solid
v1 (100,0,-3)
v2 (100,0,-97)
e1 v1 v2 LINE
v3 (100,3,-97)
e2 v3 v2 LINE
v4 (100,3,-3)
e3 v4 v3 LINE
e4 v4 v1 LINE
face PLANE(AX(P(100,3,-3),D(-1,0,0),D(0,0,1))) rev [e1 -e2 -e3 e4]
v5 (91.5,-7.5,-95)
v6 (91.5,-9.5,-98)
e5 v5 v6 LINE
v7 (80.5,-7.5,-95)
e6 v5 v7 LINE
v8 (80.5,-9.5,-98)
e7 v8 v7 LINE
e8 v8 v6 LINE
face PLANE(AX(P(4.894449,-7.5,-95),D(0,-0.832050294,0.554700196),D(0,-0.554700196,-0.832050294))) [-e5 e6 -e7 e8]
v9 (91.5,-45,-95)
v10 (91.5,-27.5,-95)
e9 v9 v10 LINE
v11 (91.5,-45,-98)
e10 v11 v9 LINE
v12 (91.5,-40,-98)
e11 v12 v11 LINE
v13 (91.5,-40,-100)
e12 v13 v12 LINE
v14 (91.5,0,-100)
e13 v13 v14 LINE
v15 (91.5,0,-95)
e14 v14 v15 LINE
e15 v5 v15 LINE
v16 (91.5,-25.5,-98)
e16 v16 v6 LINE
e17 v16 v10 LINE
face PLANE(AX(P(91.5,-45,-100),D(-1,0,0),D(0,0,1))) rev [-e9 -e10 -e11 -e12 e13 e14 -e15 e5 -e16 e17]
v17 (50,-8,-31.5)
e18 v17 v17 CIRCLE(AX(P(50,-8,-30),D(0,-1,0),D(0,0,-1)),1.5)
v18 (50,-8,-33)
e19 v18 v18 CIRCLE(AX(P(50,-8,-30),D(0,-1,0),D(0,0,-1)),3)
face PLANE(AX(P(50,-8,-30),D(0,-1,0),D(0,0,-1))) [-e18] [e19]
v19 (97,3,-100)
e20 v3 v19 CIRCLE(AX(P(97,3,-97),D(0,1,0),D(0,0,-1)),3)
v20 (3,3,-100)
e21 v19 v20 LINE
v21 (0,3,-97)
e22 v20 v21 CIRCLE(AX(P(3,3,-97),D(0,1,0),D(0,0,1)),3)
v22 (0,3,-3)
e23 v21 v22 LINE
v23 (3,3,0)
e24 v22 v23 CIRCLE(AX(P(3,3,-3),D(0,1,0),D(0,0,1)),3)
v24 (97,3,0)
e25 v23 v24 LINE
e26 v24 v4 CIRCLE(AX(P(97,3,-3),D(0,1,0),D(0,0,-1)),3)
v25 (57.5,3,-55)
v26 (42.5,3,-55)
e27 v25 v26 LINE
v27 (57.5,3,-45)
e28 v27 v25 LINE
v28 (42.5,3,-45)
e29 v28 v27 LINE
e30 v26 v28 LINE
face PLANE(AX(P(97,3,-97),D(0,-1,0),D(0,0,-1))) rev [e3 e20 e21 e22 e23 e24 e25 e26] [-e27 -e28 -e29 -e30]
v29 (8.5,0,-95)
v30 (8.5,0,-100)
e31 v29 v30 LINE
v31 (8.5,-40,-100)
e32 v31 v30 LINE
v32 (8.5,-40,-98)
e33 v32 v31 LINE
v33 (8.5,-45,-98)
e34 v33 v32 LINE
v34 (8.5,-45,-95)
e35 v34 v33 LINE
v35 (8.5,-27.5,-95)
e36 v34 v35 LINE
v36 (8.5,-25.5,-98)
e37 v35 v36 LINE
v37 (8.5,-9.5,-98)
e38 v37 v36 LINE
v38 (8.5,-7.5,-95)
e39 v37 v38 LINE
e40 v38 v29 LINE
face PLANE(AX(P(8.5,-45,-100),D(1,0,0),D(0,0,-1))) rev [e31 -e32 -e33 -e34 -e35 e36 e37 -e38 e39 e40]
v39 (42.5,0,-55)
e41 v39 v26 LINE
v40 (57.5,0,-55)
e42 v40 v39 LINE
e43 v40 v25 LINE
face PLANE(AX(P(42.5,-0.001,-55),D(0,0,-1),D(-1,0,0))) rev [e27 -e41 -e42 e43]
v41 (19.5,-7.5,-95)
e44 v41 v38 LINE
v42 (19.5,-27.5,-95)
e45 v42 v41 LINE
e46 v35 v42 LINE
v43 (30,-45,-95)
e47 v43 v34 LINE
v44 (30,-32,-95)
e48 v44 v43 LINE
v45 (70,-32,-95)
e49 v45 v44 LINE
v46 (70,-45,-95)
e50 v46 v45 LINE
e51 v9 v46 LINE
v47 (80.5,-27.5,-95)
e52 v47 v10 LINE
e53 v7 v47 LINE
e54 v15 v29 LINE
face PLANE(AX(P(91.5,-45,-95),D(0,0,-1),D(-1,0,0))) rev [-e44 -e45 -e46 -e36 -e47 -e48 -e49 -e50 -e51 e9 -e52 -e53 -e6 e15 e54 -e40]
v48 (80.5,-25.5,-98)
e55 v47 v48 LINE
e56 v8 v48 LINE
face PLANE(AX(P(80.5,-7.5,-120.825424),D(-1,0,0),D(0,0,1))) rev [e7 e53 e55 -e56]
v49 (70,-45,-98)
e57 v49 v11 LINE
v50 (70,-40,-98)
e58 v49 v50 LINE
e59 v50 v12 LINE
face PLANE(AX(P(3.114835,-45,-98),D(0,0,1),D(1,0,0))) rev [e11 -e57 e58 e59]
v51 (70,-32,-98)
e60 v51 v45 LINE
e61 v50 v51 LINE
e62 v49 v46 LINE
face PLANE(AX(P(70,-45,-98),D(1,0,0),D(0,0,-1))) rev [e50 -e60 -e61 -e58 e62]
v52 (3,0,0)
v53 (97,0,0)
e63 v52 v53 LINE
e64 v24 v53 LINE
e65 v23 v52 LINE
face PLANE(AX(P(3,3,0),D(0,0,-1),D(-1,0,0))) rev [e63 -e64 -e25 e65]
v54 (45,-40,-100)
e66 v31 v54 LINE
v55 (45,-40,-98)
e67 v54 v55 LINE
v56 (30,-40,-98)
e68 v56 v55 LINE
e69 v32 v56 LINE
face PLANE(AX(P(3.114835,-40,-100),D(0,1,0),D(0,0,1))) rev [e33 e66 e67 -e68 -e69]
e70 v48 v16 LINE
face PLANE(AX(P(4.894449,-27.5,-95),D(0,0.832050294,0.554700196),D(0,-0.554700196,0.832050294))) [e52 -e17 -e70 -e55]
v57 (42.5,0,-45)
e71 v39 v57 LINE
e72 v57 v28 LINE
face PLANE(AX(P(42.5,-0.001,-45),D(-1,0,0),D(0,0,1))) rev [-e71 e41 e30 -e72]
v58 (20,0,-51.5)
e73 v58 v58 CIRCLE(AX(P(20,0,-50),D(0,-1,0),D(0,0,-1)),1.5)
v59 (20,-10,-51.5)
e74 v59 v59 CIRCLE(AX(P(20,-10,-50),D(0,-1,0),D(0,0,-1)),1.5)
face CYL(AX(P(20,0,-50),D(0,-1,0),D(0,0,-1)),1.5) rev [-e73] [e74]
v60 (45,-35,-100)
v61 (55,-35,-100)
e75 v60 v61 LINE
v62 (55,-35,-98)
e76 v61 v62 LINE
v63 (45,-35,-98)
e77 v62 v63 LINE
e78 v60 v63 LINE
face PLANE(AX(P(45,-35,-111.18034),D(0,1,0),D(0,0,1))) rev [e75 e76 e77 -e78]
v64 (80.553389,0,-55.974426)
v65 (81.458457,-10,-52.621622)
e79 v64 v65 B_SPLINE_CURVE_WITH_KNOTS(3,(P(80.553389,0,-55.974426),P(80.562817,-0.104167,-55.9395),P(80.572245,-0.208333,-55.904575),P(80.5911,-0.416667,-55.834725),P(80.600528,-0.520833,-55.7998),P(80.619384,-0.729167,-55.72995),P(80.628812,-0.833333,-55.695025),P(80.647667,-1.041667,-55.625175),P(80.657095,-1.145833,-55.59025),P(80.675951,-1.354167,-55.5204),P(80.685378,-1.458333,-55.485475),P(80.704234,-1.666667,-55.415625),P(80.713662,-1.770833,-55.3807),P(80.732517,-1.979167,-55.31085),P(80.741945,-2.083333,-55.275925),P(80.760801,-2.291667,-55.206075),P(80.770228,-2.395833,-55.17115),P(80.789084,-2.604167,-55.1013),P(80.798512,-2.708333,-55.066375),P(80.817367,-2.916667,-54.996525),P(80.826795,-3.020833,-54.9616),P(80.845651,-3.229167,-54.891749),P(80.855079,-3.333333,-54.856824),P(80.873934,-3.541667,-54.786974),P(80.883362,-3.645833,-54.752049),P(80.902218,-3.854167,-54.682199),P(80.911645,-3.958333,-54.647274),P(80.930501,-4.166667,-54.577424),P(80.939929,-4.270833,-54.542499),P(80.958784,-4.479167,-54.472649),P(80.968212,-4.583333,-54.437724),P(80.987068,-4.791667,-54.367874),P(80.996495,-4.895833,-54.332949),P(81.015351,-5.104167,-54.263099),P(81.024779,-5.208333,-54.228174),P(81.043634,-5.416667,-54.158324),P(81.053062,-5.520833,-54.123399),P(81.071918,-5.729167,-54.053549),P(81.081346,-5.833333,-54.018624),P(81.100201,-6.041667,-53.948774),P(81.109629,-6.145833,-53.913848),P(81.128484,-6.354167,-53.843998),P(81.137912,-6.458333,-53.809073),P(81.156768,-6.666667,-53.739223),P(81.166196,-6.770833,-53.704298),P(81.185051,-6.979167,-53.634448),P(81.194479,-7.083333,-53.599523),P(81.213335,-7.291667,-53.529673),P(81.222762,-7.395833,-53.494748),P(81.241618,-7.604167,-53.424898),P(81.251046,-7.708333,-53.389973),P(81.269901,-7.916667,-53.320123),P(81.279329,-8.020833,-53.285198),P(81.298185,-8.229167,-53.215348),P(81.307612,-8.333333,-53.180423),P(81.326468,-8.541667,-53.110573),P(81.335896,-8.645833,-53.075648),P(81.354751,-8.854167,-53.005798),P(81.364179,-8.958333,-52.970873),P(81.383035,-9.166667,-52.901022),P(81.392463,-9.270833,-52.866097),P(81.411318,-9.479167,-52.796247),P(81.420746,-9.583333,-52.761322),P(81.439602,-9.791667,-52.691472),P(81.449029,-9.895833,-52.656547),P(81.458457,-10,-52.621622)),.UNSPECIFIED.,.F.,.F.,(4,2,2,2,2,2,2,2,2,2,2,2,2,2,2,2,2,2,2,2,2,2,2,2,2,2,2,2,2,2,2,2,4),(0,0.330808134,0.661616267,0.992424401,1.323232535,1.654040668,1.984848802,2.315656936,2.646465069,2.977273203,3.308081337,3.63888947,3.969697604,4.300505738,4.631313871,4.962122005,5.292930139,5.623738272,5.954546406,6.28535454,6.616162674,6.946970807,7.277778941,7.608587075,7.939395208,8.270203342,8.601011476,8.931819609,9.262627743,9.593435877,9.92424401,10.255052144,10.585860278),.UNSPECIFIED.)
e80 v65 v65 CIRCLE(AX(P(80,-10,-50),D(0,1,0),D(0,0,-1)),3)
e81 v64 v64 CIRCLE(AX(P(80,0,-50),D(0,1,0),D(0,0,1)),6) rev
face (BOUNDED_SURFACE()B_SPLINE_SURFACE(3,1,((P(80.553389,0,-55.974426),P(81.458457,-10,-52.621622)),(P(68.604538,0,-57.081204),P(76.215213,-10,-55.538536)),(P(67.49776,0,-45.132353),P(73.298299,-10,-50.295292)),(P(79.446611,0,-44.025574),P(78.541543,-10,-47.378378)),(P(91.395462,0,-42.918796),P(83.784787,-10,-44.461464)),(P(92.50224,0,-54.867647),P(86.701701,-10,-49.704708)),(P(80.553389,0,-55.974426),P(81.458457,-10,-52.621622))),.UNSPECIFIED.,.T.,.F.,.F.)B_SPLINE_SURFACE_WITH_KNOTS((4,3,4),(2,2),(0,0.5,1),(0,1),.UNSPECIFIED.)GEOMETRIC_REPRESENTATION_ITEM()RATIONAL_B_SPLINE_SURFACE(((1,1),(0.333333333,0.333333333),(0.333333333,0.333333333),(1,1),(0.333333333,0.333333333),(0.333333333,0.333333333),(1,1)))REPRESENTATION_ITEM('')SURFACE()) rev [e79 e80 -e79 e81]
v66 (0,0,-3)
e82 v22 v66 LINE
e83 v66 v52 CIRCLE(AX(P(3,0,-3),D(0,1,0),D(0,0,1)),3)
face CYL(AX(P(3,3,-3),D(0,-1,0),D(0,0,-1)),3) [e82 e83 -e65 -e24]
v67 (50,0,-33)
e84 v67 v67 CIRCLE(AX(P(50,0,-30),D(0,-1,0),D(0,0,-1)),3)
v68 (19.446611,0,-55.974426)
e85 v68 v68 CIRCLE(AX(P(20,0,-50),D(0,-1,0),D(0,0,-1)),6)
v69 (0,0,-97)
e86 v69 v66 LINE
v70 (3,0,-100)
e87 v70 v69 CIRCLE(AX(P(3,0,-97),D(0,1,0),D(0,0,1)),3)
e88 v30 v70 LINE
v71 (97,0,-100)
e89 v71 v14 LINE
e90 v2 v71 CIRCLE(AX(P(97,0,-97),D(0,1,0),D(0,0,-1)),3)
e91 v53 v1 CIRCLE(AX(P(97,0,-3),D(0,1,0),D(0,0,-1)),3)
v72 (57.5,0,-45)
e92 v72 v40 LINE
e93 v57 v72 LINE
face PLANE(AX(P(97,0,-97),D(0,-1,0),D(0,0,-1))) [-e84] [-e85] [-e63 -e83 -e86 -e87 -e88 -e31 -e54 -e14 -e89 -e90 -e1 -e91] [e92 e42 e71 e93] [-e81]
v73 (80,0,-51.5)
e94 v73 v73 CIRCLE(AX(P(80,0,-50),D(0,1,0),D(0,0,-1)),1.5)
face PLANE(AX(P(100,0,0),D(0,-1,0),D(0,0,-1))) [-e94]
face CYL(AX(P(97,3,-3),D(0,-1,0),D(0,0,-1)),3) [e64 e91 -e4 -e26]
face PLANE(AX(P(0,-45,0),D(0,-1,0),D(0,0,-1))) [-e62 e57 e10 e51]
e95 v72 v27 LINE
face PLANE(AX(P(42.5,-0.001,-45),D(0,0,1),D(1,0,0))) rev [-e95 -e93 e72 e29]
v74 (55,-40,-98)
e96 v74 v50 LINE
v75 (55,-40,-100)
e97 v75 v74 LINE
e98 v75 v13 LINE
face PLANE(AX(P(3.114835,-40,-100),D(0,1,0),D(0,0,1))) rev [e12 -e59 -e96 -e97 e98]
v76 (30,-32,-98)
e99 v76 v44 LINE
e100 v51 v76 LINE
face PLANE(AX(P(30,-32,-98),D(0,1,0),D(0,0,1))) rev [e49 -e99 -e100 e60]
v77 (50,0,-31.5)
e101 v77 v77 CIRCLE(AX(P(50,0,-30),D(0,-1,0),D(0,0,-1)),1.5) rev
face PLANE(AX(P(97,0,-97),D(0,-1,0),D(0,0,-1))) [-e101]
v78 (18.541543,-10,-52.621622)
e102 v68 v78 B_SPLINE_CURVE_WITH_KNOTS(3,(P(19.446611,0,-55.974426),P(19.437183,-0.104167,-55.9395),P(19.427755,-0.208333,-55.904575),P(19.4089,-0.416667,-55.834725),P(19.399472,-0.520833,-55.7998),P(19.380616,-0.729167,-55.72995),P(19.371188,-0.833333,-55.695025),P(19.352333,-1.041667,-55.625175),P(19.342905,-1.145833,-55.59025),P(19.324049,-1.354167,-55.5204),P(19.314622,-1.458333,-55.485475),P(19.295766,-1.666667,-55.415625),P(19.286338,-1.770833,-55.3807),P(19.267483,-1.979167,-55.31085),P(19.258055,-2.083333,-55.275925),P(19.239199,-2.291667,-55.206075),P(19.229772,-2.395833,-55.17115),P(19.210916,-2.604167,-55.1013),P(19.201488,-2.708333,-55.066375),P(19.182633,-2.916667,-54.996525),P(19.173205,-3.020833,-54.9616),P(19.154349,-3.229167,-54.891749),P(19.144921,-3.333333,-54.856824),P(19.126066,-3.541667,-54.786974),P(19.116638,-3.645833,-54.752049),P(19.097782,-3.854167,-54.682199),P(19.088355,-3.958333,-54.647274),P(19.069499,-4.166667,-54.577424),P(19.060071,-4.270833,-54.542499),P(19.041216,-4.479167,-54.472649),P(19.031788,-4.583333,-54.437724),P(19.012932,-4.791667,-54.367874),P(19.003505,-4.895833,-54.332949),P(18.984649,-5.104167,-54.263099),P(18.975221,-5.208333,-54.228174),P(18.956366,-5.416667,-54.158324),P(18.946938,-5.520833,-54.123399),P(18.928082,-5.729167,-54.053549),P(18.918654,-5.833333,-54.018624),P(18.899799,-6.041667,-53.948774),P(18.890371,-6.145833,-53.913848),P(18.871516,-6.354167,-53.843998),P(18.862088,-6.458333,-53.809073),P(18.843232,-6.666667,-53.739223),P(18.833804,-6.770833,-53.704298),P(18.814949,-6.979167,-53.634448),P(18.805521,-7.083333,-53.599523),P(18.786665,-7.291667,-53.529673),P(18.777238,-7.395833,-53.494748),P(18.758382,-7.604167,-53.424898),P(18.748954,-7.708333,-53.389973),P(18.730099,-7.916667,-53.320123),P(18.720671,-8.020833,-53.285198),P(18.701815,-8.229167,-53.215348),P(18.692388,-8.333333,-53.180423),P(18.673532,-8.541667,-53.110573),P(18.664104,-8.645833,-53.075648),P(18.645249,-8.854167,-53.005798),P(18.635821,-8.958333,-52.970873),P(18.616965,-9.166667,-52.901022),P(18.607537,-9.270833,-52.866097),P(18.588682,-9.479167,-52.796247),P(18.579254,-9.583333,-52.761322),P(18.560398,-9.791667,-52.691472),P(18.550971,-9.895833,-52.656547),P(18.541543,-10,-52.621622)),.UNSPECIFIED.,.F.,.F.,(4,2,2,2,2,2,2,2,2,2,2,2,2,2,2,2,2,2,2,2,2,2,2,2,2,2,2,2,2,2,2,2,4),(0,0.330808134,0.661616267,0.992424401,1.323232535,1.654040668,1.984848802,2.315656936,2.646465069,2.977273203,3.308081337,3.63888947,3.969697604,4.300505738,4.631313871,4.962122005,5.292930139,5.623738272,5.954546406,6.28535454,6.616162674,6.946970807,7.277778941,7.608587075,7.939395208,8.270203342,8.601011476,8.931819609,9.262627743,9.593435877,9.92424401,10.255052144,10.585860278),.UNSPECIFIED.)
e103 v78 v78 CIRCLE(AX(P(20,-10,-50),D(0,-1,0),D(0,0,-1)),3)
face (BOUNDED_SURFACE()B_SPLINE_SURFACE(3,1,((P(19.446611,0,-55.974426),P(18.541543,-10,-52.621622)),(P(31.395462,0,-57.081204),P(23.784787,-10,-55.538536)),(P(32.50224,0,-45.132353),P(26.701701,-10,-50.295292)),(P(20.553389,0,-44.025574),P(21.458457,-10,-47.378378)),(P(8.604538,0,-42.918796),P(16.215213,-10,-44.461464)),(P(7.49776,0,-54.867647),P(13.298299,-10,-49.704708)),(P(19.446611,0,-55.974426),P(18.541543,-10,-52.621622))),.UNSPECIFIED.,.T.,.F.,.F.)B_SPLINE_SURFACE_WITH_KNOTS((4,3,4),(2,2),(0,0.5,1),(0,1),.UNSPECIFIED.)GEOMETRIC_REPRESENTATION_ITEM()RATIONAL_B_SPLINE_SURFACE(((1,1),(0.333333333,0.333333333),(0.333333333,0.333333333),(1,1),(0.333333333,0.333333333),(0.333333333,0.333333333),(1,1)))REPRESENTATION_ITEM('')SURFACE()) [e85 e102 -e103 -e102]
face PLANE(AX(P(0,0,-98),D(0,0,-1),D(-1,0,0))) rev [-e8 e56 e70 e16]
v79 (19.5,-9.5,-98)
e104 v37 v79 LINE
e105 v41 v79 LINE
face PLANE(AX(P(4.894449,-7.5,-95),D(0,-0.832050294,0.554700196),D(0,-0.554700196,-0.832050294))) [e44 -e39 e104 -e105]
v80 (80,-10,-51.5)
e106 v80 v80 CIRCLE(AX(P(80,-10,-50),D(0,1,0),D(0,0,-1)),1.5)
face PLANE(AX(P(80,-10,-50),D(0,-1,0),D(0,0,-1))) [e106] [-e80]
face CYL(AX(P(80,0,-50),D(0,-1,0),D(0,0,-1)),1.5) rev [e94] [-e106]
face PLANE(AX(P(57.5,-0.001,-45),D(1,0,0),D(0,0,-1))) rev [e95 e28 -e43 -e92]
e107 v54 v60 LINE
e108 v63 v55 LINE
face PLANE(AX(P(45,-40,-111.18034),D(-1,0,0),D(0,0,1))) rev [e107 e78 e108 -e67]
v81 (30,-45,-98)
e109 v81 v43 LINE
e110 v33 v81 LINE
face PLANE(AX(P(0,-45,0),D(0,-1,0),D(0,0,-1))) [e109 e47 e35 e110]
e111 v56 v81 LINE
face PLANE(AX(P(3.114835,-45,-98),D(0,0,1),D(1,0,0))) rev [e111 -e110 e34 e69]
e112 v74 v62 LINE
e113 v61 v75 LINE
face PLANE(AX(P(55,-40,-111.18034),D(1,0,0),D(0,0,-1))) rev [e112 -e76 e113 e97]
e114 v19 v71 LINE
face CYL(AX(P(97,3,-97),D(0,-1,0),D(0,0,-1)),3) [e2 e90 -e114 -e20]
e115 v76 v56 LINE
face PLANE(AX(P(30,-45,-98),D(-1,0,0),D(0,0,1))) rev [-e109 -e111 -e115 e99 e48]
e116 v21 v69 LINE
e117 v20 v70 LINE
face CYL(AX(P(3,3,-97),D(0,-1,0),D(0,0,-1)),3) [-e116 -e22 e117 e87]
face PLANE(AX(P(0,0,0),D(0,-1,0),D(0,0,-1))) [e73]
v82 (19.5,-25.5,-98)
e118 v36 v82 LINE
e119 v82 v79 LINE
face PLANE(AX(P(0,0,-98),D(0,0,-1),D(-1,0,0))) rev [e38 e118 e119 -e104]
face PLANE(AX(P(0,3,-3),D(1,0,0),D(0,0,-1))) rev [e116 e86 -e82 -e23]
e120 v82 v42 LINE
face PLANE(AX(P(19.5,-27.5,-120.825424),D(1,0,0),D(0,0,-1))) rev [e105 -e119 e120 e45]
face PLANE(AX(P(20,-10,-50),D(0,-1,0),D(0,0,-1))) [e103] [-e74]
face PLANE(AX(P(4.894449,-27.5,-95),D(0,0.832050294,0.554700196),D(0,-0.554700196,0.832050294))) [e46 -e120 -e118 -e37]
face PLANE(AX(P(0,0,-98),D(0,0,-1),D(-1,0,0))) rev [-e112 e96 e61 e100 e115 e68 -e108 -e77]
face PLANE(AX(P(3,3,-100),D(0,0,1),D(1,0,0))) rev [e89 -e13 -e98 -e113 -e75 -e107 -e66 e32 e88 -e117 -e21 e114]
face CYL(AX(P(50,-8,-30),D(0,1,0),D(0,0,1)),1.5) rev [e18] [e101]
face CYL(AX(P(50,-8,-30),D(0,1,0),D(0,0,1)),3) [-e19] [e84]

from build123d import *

# Parameters (mm, degrees)
EXTRUDE_354_DEPTH      = 3
CUT_EXTRUDE_1082_REACH = 143.453
SKETCH_3_W             = 15
SKETCH_3_H             = 10
SKETCH_4_R             = 3
SKETCH_4_R_2           = 1.5
EXTRUDE_1381_DEPTH     = 8
SKETCH_5_W             = 83
SKETCH_5_H             = 5
EXTRUDE_1698_DEPTH     = 45
SKETCH_6_W             = 2
SKETCH_6_H             = 5
CUT_EXTRUDE_1867_DEPTH = 83
SKETCH_7_W             = 40
SKETCH_7_H             = 13
TYPE_C_DEPTH           = 3
SKETCH_8_W             = 10
SKETCH_8_H             = 5
CUT_EXTRUDE_3_DEPTH    = 2
SKETCH_9_W             = 11
SKETCH_9_H             = 20
CUT_EXTRUDE_4_DEPTH    = 3
EXTRUDE_START          = -83
EXTRUDE_1_DEPTH        = 83
SKETCH_2_3_R           = 1.5
CUT_EXTRUDE_5_DEPTH    = 10


with BuildPart() as part:
    # 草图1 → Extrude 354 (new body)
    with BuildSketch(Plane(origin=(0, 0, 0), x_dir=(1, 0, 0), z_dir=(0, 1, 0))):
        with BuildLine():
            Line((3, 0), (97, 0))
            ThreePointArc((97, 0), (99.121320344, 0.878679656), (100, 3))
            Line((100, 3), (100, 97))
            ThreePointArc((100, 97), (99.121320344, 99.121320344), (97, 100))
            Line((97, 100), (3, 100))
            ThreePointArc((3, 100), (0.878679656, 99.121320344), (0, 97))
            Line((0, 97), (0, 3))
            ThreePointArc((0, 3), (0.878679656, 0.878679656), (3, 0))
        make_face()
    extrude(amount=EXTRUDE_354_DEPTH)

    # 草图3 → Cut-Extrude 1082 (cut, up to next)
    with BuildSketch(Plane(origin=(0, 3, 0), x_dir=(1, 0, 0), z_dir=(0, 1, 0)), mode=Mode.PRIVATE) as cut_extrude_1082_sk1:
        with Locations((50, 50)):
            Rectangle(SKETCH_3_W, SKETCH_3_H)
    cut_extrude_1082_tool1 = extrude(cut_extrude_1082_sk1.sketch, amount=-CUT_EXTRUDE_1082_REACH, mode=Mode.PRIVATE) & part.part
    add(cut_extrude_1082_tool1.solids().sort_by_distance((50, 3, -50))[0], mode=Mode.SUBTRACT)

    # 草图4 → Extrude 1381 (add)
    with BuildSketch(Plane.XZ):
        with Locations(Location((50, -30, 0), (0, 0, 270))):
            Circle(SKETCH_4_R)
        with Locations(Location((50, -30, 0), (0, 0, 270))):
            Circle(SKETCH_4_R_2, mode=Mode.SUBTRACT)
    extrude(amount=EXTRUDE_1381_DEPTH)

    # 草图5 → Extrude 1698 (add)
    with BuildSketch(Plane.XZ):
        with Locations((50, -97.5)):
            Rectangle(SKETCH_5_W, SKETCH_5_H)
    extrude(amount=EXTRUDE_1698_DEPTH)

    # 草图6 → Cut-Extrude 1867 (cut)
    with BuildSketch(Plane(origin=(91.5, 0, 0), x_dir=(0, 0, -1), z_dir=(1, 0, 0))):
        with Locations((99, -42.5)):
            Rectangle(SKETCH_6_W, SKETCH_6_H)
    extrude(amount=-CUT_EXTRUDE_1867_DEPTH, mode=Mode.SUBTRACT)

    # 草图7 → TYPE-C板口 (cut)
    with BuildSketch(Plane.XY.offset(-95)):
        with Locations((50, -38.5)):
            Rectangle(SKETCH_7_W, SKETCH_7_H)
    extrude(amount=-TYPE_C_DEPTH, mode=Mode.SUBTRACT)

    # 草图8 → 切除-拉伸3 (cut)
    with BuildSketch(Plane.XY.offset(-98)):
        with Locations((50, -37.5)):
            Rectangle(SKETCH_8_W, SKETCH_8_H)
    extrude(amount=-CUT_EXTRUDE_3_DEPTH, mode=Mode.SUBTRACT)

    # 草图9 → 切除-拉伸4 (cut)
    with BuildSketch(Plane.XY.offset(-95)):
        with Locations((86, -17.5)):
            Rectangle(SKETCH_9_W, SKETCH_9_H)
        with Locations((14, -17.5)):
            Rectangle(SKETCH_9_W, SKETCH_9_H)
    extrude(amount=-CUT_EXTRUDE_4_DEPTH, mode=Mode.SUBTRACT)

    # 草图10 → 凸台-拉伸1 (add)
    with BuildSketch(Plane(origin=(91.5, 0, 0), x_dir=(0, 0, -1), z_dir=(1, 0, 0)).offset(EXTRUDE_START)):
        Polygon((95, -7.5), (98, -9.5), (98, -7.5), align=None)
        Polygon((95, -27.5), (98, -25.5), (98, -27.5), align=None)
    extrude(amount=EXTRUDE_1_DEPTH)

    # 放样2: read off the stored shape, not the designer's step
    # 放样2: loft between two sections, ruled curve by curve
    loft_2_from = [
        Edge.make_bspline([(19.446610657, 0, -55.974425515), (31.395461687, 0, -57.081204201), (32.502240373, 0, -45.132353171), (20.553389343, 0, -44.025574485), (8.604538313, 0, -42.918795799), (7.497759627, 0, -54.867646829), (19.446610657, 0, -55.974425515)], [0, 0, 0, 0, 0.5, 0.5, 0.5, 1, 1, 1, 1], 3, [1, 0.333333333, 0.333333333, 1, 0.333333333, 0.333333333, 1]),
    ]
    loft_2_to = [
        Edge.make_bspline([(18.541542898, -10, -52.621622185), (23.784787268, -10, -55.538536389), (26.701701472, -10, -50.295292019), (21.458457102, -10, -47.378377815), (16.215212732, -10, -44.461463611), (13.298298528, -10, -49.704707981), (18.541542898, -10, -52.621622185)], [0, 0, 0, 0, 0.5, 0.5, 0.5, 1, 1, 1, 1], 3, [1, 0.333333333, 0.333333333, 1, 0.333333333, 0.333333333, 1]),
    ]
    loft_2 = Solid(Shell([*[Face.make_surface_from_curves(loft_2_from[k], loft_2_to[k]) for k in range(1)], Face(Wire(loft_2_from)), Face(Wire(loft_2_to))]))
    add(loft_2)

    # 草图2<3> → 切除-拉伸5 (cut)
    with BuildSketch(Plane.XZ.offset(10)):
        with Locations(Location((20, -50, 0), (0, 0, 270))):
            Circle(SKETCH_2_3_R)
    cut_extrude_5 = extrude(amount=-CUT_EXTRUDE_5_DEPTH, mode=Mode.SUBTRACT)

    # 镜向1: 放样2, 切除-拉伸5 across plane
    add(loft_2.mirror(Plane.ZY.offset(-50)))
    add(cut_extrude_5.mirror(Plane.ZY.offset(-50)), mode=Mode.SUBTRACT)


solid = part.part
